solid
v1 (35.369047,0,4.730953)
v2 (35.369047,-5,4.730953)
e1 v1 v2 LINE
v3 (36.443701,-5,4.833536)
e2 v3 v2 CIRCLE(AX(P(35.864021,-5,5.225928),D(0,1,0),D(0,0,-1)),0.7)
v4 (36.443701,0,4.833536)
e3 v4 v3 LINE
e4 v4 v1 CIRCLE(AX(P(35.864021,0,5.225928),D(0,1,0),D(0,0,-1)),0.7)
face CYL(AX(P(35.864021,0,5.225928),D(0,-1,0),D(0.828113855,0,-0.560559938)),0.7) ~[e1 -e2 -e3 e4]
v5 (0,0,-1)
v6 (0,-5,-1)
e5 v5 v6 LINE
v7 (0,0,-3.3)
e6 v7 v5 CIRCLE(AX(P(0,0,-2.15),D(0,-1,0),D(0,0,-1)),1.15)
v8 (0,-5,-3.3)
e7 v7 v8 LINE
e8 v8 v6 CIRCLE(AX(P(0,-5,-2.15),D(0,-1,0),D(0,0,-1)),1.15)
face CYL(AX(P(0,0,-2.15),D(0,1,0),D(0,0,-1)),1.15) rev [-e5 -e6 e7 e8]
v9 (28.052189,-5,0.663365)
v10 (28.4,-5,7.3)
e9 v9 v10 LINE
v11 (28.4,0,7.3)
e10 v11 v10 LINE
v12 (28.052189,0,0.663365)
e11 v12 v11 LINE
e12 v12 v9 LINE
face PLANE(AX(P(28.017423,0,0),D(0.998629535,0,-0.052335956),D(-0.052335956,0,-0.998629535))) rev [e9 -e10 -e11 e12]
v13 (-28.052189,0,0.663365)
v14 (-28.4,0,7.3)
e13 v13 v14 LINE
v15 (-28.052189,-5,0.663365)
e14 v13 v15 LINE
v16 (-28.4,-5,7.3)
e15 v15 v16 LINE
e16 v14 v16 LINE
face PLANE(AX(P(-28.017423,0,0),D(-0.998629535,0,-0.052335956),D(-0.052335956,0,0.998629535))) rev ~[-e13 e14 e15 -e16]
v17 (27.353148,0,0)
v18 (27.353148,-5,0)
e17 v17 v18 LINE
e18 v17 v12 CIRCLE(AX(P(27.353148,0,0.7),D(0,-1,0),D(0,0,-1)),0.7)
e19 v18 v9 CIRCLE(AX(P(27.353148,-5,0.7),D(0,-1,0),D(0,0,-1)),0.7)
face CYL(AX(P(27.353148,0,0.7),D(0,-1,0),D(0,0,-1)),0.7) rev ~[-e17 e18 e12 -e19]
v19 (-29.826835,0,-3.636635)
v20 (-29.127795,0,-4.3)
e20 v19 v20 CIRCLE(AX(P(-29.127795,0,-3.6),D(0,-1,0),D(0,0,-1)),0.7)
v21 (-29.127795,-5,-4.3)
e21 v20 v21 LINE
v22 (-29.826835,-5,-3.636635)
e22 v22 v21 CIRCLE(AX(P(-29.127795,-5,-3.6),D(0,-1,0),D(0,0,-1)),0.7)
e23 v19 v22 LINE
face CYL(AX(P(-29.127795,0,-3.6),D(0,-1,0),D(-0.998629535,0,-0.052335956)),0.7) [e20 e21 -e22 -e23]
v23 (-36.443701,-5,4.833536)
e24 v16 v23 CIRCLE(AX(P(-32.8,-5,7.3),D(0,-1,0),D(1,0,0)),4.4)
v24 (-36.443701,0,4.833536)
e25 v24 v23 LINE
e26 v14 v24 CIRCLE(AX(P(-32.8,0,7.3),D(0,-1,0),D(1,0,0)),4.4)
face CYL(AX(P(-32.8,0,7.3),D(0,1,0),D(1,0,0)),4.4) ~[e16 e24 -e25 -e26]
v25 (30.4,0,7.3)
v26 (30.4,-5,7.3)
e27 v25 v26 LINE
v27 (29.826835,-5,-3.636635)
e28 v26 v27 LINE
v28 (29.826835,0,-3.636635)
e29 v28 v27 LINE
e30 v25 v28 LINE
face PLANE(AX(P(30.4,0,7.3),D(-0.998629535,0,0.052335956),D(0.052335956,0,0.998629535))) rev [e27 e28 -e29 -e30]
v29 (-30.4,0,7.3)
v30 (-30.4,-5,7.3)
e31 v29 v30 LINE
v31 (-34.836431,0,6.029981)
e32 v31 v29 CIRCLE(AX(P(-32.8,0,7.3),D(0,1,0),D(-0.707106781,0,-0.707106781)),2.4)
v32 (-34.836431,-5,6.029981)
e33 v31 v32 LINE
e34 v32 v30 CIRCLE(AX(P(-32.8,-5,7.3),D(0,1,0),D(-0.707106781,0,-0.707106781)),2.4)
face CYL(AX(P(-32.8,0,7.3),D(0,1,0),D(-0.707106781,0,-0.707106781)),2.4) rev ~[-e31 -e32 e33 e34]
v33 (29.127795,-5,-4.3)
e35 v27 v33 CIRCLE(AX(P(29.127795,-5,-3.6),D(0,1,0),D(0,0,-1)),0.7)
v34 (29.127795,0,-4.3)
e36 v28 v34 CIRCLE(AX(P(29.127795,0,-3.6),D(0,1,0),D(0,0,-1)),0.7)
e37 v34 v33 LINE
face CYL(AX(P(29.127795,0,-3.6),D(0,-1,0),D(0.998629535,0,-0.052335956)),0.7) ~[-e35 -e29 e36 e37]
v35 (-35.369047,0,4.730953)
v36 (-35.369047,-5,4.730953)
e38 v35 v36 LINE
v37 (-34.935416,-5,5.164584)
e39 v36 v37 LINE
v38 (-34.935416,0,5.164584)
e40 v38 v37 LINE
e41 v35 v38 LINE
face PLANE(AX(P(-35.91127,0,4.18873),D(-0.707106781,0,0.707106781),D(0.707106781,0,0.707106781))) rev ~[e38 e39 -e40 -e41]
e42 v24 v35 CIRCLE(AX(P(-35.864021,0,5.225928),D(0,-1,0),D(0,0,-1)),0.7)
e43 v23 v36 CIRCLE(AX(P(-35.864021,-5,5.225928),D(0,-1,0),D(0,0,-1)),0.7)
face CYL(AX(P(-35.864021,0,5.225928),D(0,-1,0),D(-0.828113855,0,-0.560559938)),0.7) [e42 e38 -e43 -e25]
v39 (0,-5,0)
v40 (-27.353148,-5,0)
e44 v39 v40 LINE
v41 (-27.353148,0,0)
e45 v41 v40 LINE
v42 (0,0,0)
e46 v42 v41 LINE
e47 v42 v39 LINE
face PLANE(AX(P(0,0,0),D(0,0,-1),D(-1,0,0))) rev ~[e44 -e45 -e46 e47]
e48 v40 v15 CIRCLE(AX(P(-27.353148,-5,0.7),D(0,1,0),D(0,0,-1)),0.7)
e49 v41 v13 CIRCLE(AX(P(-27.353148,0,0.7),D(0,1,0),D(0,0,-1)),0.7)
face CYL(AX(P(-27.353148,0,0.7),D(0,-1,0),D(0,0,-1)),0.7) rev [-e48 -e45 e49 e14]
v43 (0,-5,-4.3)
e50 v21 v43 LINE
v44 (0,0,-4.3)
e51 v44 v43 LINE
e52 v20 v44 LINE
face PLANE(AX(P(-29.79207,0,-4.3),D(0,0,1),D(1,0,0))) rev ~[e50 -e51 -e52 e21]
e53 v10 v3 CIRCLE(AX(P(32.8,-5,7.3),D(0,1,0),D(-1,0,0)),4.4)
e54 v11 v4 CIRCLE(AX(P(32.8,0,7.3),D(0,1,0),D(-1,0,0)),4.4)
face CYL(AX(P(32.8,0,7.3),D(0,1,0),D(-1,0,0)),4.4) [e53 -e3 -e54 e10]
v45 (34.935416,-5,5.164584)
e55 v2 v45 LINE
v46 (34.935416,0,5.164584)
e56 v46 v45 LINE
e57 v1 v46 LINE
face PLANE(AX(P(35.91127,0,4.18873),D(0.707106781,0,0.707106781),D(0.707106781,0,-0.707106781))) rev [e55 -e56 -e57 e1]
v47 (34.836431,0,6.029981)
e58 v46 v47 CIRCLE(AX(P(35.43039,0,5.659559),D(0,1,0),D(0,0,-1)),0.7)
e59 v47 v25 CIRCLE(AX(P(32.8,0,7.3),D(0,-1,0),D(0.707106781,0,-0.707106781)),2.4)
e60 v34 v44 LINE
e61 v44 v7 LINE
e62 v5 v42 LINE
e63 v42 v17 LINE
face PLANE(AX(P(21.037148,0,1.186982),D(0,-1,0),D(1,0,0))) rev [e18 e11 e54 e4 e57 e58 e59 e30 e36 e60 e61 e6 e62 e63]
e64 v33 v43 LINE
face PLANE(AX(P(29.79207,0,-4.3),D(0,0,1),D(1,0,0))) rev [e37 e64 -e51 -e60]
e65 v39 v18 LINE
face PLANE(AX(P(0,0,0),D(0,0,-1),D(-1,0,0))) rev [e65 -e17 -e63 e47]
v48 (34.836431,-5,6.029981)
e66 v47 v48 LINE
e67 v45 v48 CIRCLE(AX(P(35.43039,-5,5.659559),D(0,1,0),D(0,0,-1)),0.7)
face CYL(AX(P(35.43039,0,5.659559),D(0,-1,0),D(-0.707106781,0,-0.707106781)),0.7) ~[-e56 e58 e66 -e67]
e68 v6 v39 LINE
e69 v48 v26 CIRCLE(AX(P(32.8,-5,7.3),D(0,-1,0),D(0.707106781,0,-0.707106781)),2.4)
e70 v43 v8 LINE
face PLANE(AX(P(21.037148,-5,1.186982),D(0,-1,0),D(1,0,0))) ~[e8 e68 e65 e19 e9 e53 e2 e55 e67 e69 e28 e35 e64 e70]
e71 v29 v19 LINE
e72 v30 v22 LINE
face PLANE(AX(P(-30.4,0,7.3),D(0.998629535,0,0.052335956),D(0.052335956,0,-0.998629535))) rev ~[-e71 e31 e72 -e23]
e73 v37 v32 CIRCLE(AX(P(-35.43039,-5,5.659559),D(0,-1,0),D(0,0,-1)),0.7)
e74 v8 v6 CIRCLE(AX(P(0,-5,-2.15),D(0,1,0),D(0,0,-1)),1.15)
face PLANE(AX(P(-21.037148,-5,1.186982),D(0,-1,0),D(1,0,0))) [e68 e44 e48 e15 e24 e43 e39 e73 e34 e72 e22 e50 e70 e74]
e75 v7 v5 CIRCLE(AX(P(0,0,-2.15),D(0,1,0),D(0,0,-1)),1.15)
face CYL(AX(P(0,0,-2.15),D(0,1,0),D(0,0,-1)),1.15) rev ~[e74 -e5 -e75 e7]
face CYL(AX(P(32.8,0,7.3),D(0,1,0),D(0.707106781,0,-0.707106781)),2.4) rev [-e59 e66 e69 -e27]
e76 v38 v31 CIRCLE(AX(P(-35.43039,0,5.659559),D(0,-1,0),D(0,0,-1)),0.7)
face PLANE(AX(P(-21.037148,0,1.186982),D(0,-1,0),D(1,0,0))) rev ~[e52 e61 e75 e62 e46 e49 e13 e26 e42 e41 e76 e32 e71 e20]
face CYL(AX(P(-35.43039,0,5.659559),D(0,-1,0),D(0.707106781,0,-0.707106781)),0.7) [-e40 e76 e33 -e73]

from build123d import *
from build123d import SkipClean  # not in build123d's __all__

# Parameters (mm, degrees)
F1_DEPTH = 5
F2_R     = 0.7


with BuildPart() as f1:
    # F0 (on Front) → F1 (new body)
    with BuildSketch(Plane.XZ):
        with BuildLine():
            Line((0, -1), (0, 0))
            Line((0, 0), (-28.0174232112, 0))
            Line((-28.0174232112, 0), (-28.4, 7.3))
            ThreePointArc((-28.4, 7.3), (-34.4838071024, 11.365069943), (-35.9112698372, 4.1887301628))
            Line((-35.9112698372, 4.1887301628), (-34.4970562748, 5.6029437252))
            ThreePointArc((-34.4970562748, 5.6029437252), (-33.7184402377, 9.517310878), (-30.4, 7.3))
            Line((-30.4, 7.3), (-29.7920697603, -4.3))
            Line((-29.7920697603, -4.3), (0, -4.3))
            Line((0, -4.3), (0, -3.3))
            ThreePointArc((0, -3.3), (-1.15, -2.15), (0, -1))
        make_face()
    extrude(amount=F1_DEPTH)

    # F2
    f2_edges = [f1.edges().sort_by_distance(p)[0] for p in [
        (-28.017423, -2.5, 0),
        (-29.79207, -2.5, -4.3),
        (-34.497056, -2.5, 5.602944),
        (-35.91127, -2.5, 4.18873),
    ]]
    fillet(f2_edges, radius=F2_R)

    # F3: F1 across plane


with BuildPart() as f1_1:
    add(f1.part, clean=False)
    with SkipClean():  # cleaning this boolean's faces spoils the solid; the shape is the same uncleaned
        add(f1.part.mirror(Plane.YZ), clean=False)


solid = f1_1.part
